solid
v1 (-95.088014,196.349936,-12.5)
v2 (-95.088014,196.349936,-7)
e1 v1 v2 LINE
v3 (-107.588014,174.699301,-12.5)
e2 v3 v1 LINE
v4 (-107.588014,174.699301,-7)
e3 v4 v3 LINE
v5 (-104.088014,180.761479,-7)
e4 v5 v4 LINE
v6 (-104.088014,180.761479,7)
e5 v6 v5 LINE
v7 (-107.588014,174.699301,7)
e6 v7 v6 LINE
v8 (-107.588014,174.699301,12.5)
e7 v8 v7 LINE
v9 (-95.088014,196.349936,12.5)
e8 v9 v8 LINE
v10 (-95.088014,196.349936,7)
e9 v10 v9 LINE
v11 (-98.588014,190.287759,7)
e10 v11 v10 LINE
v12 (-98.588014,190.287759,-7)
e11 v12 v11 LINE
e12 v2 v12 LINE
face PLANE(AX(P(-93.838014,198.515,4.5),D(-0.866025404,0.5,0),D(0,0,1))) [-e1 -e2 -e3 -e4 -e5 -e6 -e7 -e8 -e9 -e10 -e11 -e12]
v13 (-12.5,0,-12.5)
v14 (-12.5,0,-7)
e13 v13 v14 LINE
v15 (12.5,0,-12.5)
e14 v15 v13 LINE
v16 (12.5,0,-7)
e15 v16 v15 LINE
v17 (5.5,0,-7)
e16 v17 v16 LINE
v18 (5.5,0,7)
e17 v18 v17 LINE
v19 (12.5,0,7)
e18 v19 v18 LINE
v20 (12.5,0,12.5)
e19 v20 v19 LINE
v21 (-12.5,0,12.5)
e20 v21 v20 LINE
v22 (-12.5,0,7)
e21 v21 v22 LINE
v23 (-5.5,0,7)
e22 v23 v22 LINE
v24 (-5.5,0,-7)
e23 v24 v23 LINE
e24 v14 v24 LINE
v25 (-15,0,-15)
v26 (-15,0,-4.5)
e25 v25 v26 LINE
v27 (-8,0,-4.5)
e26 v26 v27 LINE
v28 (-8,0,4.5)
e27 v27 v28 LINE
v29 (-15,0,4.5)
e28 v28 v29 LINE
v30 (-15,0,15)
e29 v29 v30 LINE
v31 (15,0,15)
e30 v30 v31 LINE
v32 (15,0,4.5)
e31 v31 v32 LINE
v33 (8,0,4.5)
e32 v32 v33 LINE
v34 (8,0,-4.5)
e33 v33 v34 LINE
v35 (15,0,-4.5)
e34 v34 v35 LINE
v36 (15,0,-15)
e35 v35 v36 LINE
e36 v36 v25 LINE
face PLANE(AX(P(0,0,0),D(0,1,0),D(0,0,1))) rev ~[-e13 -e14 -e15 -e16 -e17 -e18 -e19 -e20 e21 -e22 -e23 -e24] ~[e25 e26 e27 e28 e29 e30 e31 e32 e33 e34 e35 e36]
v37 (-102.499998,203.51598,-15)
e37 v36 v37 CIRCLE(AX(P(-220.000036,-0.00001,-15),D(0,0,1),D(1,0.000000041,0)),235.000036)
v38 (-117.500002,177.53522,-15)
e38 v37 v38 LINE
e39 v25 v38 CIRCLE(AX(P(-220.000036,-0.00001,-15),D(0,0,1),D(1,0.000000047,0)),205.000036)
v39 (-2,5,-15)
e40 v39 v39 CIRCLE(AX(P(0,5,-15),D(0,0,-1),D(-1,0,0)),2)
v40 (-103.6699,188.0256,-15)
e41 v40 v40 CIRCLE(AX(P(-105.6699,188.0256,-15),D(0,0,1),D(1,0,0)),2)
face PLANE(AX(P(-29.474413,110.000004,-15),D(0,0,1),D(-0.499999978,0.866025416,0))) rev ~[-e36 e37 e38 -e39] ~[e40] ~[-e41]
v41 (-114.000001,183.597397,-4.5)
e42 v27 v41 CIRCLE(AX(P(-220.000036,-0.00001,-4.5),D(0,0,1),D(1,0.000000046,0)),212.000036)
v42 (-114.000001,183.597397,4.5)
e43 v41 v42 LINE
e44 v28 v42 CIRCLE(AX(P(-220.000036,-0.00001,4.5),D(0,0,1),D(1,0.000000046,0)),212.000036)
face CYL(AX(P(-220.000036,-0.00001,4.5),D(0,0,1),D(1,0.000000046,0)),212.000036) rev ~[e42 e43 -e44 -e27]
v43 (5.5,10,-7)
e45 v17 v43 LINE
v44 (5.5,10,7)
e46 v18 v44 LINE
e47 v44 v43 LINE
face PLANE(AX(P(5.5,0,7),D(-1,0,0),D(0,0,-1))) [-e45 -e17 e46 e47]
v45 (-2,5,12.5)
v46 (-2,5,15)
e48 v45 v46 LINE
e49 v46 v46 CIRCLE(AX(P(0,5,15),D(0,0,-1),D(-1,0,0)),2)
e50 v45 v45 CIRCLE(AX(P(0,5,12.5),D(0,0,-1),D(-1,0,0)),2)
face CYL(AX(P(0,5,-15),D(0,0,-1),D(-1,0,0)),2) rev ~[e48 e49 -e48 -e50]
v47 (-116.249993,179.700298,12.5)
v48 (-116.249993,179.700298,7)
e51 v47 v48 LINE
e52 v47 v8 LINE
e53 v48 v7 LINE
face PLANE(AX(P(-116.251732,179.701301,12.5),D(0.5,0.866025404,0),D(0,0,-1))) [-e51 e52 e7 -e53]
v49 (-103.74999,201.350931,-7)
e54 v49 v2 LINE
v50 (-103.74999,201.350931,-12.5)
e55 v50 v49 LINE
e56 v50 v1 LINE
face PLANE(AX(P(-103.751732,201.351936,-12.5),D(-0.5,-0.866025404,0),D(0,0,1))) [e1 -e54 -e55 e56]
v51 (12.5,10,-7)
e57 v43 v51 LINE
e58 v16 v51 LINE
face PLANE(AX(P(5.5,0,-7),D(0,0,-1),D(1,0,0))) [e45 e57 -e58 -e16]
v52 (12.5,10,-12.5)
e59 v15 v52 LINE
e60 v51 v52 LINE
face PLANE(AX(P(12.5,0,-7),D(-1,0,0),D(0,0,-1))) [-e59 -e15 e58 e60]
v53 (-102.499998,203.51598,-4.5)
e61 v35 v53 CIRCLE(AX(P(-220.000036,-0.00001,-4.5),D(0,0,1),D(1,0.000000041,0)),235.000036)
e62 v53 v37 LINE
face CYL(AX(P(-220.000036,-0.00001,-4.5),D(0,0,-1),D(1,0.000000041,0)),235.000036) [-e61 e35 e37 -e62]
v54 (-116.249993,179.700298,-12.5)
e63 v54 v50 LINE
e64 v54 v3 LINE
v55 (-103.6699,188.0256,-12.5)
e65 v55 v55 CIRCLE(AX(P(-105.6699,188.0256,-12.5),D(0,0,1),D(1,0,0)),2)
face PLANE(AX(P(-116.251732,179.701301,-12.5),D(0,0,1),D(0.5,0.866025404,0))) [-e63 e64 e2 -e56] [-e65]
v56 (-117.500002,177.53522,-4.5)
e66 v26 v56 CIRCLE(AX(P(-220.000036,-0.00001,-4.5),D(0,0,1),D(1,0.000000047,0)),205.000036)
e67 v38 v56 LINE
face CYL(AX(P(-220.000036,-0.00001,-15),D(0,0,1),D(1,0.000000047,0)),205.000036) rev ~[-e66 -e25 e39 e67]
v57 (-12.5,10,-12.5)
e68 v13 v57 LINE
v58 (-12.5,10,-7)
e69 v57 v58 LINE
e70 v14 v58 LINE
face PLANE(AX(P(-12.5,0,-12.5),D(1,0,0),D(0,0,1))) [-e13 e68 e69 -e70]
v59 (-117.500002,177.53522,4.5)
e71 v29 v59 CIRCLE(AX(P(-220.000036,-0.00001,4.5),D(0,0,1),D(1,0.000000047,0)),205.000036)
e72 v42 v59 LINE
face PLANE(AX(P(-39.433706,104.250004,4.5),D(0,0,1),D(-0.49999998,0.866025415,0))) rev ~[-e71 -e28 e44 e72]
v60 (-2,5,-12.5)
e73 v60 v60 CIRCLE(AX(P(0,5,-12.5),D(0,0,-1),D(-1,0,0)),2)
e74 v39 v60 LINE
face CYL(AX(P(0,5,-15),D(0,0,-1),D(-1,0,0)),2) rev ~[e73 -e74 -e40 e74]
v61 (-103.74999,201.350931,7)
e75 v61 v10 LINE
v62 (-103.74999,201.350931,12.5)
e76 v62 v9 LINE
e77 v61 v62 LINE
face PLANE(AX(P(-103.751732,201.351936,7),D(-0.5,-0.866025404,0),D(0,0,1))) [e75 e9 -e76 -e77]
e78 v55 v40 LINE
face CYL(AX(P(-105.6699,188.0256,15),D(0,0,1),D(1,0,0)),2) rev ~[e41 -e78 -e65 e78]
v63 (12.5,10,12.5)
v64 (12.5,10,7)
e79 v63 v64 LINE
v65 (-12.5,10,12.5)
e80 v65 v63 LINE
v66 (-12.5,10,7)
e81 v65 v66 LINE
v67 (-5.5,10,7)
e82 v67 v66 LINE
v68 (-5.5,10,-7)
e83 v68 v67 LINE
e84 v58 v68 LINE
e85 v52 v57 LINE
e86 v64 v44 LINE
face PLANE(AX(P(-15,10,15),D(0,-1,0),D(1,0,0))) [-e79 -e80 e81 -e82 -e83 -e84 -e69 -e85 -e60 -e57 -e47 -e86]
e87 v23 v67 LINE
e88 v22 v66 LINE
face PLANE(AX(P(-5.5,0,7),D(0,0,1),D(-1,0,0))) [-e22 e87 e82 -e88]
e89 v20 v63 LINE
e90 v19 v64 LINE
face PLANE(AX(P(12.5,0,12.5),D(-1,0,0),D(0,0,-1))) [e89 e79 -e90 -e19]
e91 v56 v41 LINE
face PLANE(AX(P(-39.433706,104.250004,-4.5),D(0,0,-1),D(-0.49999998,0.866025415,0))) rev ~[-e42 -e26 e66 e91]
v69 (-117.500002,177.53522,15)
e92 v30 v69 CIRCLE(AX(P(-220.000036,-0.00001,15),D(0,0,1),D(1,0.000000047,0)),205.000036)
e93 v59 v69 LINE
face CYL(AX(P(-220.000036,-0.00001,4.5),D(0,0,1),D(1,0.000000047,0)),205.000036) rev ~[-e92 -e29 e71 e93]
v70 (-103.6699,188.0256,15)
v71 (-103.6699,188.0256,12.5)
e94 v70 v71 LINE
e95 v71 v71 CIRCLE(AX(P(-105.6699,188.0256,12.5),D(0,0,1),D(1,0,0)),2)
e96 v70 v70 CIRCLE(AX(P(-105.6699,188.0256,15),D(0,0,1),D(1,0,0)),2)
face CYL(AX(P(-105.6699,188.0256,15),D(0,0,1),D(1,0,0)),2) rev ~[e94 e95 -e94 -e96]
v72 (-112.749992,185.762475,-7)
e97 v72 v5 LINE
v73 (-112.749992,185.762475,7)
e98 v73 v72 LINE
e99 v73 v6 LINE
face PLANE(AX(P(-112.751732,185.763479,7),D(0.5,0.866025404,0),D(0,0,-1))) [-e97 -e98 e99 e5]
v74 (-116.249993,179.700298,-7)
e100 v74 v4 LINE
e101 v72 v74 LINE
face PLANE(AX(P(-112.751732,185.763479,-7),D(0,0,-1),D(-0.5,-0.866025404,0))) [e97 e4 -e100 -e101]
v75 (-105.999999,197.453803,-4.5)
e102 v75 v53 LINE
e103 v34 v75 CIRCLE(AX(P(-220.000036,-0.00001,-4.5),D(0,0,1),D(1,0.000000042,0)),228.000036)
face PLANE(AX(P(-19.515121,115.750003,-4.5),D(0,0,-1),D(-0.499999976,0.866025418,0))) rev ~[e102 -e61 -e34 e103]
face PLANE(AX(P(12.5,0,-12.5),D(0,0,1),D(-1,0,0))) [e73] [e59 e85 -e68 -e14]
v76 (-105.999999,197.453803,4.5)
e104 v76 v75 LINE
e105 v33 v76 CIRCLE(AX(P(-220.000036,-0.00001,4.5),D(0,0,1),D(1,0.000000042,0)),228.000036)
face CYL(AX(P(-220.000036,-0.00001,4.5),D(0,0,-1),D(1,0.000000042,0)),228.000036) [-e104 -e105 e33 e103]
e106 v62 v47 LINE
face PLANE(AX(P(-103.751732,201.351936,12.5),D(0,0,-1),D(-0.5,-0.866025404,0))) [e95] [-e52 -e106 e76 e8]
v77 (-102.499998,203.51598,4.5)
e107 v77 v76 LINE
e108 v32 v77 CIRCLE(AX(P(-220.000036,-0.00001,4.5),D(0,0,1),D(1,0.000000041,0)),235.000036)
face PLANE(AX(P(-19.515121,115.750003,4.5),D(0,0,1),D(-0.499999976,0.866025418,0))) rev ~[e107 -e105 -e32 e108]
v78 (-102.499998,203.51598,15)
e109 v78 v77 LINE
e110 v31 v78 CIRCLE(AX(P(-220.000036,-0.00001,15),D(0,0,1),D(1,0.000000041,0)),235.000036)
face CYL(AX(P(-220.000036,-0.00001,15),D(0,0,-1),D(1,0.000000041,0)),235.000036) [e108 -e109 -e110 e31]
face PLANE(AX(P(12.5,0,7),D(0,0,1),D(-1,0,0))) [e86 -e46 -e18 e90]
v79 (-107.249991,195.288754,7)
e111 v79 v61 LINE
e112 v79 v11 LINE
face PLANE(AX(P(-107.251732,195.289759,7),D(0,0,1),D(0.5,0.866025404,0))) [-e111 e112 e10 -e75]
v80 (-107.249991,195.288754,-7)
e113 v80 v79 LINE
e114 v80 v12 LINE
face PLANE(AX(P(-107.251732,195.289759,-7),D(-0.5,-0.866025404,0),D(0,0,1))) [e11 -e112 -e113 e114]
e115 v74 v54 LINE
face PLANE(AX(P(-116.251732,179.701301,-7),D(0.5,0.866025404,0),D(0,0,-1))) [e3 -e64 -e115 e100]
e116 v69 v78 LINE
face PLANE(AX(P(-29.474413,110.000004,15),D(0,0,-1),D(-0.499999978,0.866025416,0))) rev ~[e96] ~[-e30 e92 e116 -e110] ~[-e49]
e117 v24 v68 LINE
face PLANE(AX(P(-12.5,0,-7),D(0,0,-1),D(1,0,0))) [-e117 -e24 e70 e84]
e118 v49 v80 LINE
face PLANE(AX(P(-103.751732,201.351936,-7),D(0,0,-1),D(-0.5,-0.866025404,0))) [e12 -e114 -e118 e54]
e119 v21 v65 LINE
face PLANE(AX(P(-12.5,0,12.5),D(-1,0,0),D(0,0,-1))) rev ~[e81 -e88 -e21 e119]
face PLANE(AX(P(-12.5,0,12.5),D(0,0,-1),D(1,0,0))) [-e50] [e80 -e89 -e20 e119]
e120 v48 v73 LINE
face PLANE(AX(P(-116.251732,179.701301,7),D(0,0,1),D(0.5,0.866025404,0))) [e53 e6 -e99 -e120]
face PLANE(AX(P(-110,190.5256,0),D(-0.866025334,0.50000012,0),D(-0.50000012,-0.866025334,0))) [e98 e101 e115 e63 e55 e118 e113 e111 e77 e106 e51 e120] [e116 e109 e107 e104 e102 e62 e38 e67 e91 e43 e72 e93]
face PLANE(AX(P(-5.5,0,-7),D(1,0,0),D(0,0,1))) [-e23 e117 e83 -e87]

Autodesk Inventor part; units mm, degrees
ref_plane "YZ Plane" through (0, 0, 0) normal (1, 0, 0) x (0, 1, 0)
ref_plane "XZ Plane" through (0, 0, 0) normal (0, 1, 0) x (-1, 0, 0)
ref_plane "XY Plane" through (0, 0, 0) normal (0, 0, 1) x (1, 0, 0)
sketch "Sketch2" plane through (0, 0, 0) normal (0, 1, 0) x (-1, 0, 0)
  line L0 (15, 15) -> (-15, 15)
  line L1 (-15, -15) -> (15, -15)
  line L2 (15, 4.5) -> (8, 4.5)
  line L3 (8, 4.5) -> (8, -4.5)
  line L4 (8, -4.5) -> (15, -4.5)
  line L5 (-15, 4.5) -> (-8, 4.5)
  line L6 (-8, 4.5) -> (-8, -4.5)
  line L7 (-8, -4.5) -> (-15, -4.5)
  line L8 (15, -15) -> (15, -4.5)
  line L9 (15, 4.5) -> (15, 15)
  line L10 (-15, 15) -> (-15, 4.5)
  line L11 (-15, -4.5) -> (-15, -15)
  point P0 (0, 0)
  dimension "d18" = 9
  dimension "d19" = 7
  dimension "d21" = 16
  dimension "d22" = 30
  dimension "d23" = 15
  dimension "d24" = 4.5
  dimension "d25" = 8
sketch "Sketch6" plane through (0, 0, 0) normal (0, 0, 1) x (1, 0, 0)
  arc A0 (0, 0) -> (-110, 190.5256) centre (-220, 0) ccw
  line L0 (-220, 0) -> (-110, 190.5256) construction
  line L1 (-220, 0) -> (0, 0) construction
  dimension "d41" = 220
  dimension "d42" = 60
  dimension "d43" = 220
  dimension "d44" = 0
sweep "Sweep2" add profiles "Sketch2" path "Sketch6"
sketch "Sketch7" plane through (-102.5, 203.516, 4.5) normal (-0.8660254, 0.5, 0) x (0, 0, 1)
  line L0 (-17, -2.5) -> (-11.5, -2.5)
  line L1 (-11.5, -2.5) -> (-11.5, -9.5)
  line L2 (-11.5, -9.5) -> (2.5, -9.5)
  line L3 (2.5, -9.5) -> (2.5, -2.5)
  line L4 (2.5, -2.5) -> (8, -2.5)
  line L5 (8, -2.5) -> (8, -27.5)
  line L6 (8, -27.5) -> (2.5, -27.5)
  line L7 (2.5, -27.5) -> (2.5, -20.5)
  line L8 (2.5, -20.5) -> (-11.5, -20.5)
  line L9 (-11.5, -20.5) -> (-11.5, -27.5)
  line L10 (-11.5, -27.5) -> (-17, -27.5)
  line L11 (-17, -27.5) -> (-17, -2.5)
  line L12 (-19.5, 0) -> (-19.5, -30) projected
  line L13 (-9, -7) -> (-9, 0) projected
  line L14 (0, 0) -> (0, -7) projected
  line L15 (10.5, -30) -> (10.5, 0) projected
  line L16 (-19.5, -30) -> (-9, -30) projected
  line L17 (-9, 0) -> (-19.5, 0) projected
  line L18 (0, -30) -> (10.5, -30) projected
  line L19 (-9, -23) -> (0, -23) projected
  line L20 (0, -7) -> (-9, -7) projected
  point P0 (-4.5, -125)
  point P1 (-14.25, 0)
  dimension "d47" = 2.5
  dimension "d48" = 2.5
  dimension "d49" = 2.5
  dimension "d50" = 2.5
  dimension "d51" = 2.5
  dimension "d52" = 2.5
  dimension "d53" = 2.5
  dimension "d54" = 2.5
  dimension "d55" = 2.5
extrude "Extrusion3" cut sketch "Sketch7" against normal blind 10
sketch "Sketch9" plane through (-15, 0, 15) normal (0, 0, 1) x (1, 0, 0)
  circle A0 centre (-90.6699, 188.0256) radius 2
  line L0 (-90.6699, 188.0256) -> (-95, 190.5256) construction
  line L1 (-95, 190.5256) -> (-102.5, 177.5352) construction
  line L2 (-102.5, 177.5352) -> (-87.5, 203.516) projected
  point P0 (15, 0)
  dimension "d63" = 4
  dimension "d65" = 5
  dimension "d66" = 15
extrude "Extrusion5" cut sketch "Sketch9" against normal through all
sketch "Sketch10" plane through (-15, 0, 15) normal (0, -1, 0) x (1, 0, 0)
  line L0 (2.5, -2.5) -> (27.5, -2.5)
  line L1 (27.5, -2.5) -> (27.5, -8)
  line L2 (27.5, -8) -> (20.5, -8)
  line L3 (20.5, -8) -> (20.5, -22)
  line L4 (20.5, -22) -> (27.5, -22)
  line L5 (27.5, -22) -> (27.5, -27.5)
  line L6 (27.5, -27.5) -> (2.5, -27.5)
  line L7 (2.5, -27.5) -> (2.5, -22)
  line L8 (2.5, -22) -> (9.5, -22)
  line L9 (9.5, -22) -> (9.5, -8)
  line L10 (9.5, -8) -> (2.5, -8)
  line L11 (2.5, -2.5) -> (2.5, -8)
  line L12 (0, -10.5) -> (0, 0) projected
  line L13 (0, 0) -> (30, 0) projected
  line L14 (30, 0) -> (30, -10.5) projected
  line L15 (7, -19.5) -> (7, -10.5) projected
  line L16 (23, -10.5) -> (23, -19.5) projected
  line L17 (30, -30) -> (0, -30) projected
  line L18 (23, -19.5) -> (30, -19.5) projected
  line L19 (30, -10.5) -> (23, -10.5) projected
  point P0 (15, -15)
  point P1 (0, -5.25)
  point P2 (30, -5.25)
  point P3 (23, -15)
  point P4 (26.5, -19.5)
  dimension "d69" = 2.5
  dimension "d70" = 2.5
  dimension "d71" = 2.5
  dimension "d72" = 2.5
  dimension "d73" = 2.5
  dimension "d74" = 2.5
  dimension "d75" = 2.5
  dimension "d76" = 2.5
extrude "Extrusion6" cut sketch "Sketch10" against normal blind 10
sketch "Sketch11" plane through (15, 0, -15) normal (0, 0, -1) x (-1, 0, 0)
  circle A0 centre (15, 5) radius 2
  line L0 (0, 0) -> (30, 0) projected
  point P0 (15, 0)
  point P1 (15, 0)
  dimension "d79" = 4
  dimension "d80" = 5
  dimension "d81" = 15
extrude "Extrusion7" cut sketch "Sketch11" against normal through all
sketch "Sketch12" plane through (-15, 0, 15) normal (0, 0, 1) x (1, 0, 0)
  line L0 (52.0574, -18.6424) -> (-62.9426, -18.6424)
  line L1 (-62.9426, 220.5256) -> (52.0574, 220.5256)
  line L2 (52.0574, 220.5256) -> (52.0574, -18.6424)
  line L3 (0, 0) -> (30, 0) projected
  line L4 (-62.9426, 220.5256) -> (-96.15, 163.0087)
  line L5 (-96.15, 163.0087) -> (-96.15, -18.6424)
  line L6 (-62.9426, -18.6424) -> (-96.15, -18.6424)
  line L7 (-102.5, 177.5352) -> (-87.5, 203.516) projected
  point P0 (15, 0)
  point P1 (15, 0)
  point P2 (15, 0)
  dimension "d85" = 239.168
  dimension "d86" = 37.0574
  dimension "d87" = 18.6424
  dimension "d90" = 148.2074
  dimension "d91" = 115
  dimension "d92" = 181.6511
extrude "Extrusion8" [suppressed]
properties part number "LightRail_endSection"
